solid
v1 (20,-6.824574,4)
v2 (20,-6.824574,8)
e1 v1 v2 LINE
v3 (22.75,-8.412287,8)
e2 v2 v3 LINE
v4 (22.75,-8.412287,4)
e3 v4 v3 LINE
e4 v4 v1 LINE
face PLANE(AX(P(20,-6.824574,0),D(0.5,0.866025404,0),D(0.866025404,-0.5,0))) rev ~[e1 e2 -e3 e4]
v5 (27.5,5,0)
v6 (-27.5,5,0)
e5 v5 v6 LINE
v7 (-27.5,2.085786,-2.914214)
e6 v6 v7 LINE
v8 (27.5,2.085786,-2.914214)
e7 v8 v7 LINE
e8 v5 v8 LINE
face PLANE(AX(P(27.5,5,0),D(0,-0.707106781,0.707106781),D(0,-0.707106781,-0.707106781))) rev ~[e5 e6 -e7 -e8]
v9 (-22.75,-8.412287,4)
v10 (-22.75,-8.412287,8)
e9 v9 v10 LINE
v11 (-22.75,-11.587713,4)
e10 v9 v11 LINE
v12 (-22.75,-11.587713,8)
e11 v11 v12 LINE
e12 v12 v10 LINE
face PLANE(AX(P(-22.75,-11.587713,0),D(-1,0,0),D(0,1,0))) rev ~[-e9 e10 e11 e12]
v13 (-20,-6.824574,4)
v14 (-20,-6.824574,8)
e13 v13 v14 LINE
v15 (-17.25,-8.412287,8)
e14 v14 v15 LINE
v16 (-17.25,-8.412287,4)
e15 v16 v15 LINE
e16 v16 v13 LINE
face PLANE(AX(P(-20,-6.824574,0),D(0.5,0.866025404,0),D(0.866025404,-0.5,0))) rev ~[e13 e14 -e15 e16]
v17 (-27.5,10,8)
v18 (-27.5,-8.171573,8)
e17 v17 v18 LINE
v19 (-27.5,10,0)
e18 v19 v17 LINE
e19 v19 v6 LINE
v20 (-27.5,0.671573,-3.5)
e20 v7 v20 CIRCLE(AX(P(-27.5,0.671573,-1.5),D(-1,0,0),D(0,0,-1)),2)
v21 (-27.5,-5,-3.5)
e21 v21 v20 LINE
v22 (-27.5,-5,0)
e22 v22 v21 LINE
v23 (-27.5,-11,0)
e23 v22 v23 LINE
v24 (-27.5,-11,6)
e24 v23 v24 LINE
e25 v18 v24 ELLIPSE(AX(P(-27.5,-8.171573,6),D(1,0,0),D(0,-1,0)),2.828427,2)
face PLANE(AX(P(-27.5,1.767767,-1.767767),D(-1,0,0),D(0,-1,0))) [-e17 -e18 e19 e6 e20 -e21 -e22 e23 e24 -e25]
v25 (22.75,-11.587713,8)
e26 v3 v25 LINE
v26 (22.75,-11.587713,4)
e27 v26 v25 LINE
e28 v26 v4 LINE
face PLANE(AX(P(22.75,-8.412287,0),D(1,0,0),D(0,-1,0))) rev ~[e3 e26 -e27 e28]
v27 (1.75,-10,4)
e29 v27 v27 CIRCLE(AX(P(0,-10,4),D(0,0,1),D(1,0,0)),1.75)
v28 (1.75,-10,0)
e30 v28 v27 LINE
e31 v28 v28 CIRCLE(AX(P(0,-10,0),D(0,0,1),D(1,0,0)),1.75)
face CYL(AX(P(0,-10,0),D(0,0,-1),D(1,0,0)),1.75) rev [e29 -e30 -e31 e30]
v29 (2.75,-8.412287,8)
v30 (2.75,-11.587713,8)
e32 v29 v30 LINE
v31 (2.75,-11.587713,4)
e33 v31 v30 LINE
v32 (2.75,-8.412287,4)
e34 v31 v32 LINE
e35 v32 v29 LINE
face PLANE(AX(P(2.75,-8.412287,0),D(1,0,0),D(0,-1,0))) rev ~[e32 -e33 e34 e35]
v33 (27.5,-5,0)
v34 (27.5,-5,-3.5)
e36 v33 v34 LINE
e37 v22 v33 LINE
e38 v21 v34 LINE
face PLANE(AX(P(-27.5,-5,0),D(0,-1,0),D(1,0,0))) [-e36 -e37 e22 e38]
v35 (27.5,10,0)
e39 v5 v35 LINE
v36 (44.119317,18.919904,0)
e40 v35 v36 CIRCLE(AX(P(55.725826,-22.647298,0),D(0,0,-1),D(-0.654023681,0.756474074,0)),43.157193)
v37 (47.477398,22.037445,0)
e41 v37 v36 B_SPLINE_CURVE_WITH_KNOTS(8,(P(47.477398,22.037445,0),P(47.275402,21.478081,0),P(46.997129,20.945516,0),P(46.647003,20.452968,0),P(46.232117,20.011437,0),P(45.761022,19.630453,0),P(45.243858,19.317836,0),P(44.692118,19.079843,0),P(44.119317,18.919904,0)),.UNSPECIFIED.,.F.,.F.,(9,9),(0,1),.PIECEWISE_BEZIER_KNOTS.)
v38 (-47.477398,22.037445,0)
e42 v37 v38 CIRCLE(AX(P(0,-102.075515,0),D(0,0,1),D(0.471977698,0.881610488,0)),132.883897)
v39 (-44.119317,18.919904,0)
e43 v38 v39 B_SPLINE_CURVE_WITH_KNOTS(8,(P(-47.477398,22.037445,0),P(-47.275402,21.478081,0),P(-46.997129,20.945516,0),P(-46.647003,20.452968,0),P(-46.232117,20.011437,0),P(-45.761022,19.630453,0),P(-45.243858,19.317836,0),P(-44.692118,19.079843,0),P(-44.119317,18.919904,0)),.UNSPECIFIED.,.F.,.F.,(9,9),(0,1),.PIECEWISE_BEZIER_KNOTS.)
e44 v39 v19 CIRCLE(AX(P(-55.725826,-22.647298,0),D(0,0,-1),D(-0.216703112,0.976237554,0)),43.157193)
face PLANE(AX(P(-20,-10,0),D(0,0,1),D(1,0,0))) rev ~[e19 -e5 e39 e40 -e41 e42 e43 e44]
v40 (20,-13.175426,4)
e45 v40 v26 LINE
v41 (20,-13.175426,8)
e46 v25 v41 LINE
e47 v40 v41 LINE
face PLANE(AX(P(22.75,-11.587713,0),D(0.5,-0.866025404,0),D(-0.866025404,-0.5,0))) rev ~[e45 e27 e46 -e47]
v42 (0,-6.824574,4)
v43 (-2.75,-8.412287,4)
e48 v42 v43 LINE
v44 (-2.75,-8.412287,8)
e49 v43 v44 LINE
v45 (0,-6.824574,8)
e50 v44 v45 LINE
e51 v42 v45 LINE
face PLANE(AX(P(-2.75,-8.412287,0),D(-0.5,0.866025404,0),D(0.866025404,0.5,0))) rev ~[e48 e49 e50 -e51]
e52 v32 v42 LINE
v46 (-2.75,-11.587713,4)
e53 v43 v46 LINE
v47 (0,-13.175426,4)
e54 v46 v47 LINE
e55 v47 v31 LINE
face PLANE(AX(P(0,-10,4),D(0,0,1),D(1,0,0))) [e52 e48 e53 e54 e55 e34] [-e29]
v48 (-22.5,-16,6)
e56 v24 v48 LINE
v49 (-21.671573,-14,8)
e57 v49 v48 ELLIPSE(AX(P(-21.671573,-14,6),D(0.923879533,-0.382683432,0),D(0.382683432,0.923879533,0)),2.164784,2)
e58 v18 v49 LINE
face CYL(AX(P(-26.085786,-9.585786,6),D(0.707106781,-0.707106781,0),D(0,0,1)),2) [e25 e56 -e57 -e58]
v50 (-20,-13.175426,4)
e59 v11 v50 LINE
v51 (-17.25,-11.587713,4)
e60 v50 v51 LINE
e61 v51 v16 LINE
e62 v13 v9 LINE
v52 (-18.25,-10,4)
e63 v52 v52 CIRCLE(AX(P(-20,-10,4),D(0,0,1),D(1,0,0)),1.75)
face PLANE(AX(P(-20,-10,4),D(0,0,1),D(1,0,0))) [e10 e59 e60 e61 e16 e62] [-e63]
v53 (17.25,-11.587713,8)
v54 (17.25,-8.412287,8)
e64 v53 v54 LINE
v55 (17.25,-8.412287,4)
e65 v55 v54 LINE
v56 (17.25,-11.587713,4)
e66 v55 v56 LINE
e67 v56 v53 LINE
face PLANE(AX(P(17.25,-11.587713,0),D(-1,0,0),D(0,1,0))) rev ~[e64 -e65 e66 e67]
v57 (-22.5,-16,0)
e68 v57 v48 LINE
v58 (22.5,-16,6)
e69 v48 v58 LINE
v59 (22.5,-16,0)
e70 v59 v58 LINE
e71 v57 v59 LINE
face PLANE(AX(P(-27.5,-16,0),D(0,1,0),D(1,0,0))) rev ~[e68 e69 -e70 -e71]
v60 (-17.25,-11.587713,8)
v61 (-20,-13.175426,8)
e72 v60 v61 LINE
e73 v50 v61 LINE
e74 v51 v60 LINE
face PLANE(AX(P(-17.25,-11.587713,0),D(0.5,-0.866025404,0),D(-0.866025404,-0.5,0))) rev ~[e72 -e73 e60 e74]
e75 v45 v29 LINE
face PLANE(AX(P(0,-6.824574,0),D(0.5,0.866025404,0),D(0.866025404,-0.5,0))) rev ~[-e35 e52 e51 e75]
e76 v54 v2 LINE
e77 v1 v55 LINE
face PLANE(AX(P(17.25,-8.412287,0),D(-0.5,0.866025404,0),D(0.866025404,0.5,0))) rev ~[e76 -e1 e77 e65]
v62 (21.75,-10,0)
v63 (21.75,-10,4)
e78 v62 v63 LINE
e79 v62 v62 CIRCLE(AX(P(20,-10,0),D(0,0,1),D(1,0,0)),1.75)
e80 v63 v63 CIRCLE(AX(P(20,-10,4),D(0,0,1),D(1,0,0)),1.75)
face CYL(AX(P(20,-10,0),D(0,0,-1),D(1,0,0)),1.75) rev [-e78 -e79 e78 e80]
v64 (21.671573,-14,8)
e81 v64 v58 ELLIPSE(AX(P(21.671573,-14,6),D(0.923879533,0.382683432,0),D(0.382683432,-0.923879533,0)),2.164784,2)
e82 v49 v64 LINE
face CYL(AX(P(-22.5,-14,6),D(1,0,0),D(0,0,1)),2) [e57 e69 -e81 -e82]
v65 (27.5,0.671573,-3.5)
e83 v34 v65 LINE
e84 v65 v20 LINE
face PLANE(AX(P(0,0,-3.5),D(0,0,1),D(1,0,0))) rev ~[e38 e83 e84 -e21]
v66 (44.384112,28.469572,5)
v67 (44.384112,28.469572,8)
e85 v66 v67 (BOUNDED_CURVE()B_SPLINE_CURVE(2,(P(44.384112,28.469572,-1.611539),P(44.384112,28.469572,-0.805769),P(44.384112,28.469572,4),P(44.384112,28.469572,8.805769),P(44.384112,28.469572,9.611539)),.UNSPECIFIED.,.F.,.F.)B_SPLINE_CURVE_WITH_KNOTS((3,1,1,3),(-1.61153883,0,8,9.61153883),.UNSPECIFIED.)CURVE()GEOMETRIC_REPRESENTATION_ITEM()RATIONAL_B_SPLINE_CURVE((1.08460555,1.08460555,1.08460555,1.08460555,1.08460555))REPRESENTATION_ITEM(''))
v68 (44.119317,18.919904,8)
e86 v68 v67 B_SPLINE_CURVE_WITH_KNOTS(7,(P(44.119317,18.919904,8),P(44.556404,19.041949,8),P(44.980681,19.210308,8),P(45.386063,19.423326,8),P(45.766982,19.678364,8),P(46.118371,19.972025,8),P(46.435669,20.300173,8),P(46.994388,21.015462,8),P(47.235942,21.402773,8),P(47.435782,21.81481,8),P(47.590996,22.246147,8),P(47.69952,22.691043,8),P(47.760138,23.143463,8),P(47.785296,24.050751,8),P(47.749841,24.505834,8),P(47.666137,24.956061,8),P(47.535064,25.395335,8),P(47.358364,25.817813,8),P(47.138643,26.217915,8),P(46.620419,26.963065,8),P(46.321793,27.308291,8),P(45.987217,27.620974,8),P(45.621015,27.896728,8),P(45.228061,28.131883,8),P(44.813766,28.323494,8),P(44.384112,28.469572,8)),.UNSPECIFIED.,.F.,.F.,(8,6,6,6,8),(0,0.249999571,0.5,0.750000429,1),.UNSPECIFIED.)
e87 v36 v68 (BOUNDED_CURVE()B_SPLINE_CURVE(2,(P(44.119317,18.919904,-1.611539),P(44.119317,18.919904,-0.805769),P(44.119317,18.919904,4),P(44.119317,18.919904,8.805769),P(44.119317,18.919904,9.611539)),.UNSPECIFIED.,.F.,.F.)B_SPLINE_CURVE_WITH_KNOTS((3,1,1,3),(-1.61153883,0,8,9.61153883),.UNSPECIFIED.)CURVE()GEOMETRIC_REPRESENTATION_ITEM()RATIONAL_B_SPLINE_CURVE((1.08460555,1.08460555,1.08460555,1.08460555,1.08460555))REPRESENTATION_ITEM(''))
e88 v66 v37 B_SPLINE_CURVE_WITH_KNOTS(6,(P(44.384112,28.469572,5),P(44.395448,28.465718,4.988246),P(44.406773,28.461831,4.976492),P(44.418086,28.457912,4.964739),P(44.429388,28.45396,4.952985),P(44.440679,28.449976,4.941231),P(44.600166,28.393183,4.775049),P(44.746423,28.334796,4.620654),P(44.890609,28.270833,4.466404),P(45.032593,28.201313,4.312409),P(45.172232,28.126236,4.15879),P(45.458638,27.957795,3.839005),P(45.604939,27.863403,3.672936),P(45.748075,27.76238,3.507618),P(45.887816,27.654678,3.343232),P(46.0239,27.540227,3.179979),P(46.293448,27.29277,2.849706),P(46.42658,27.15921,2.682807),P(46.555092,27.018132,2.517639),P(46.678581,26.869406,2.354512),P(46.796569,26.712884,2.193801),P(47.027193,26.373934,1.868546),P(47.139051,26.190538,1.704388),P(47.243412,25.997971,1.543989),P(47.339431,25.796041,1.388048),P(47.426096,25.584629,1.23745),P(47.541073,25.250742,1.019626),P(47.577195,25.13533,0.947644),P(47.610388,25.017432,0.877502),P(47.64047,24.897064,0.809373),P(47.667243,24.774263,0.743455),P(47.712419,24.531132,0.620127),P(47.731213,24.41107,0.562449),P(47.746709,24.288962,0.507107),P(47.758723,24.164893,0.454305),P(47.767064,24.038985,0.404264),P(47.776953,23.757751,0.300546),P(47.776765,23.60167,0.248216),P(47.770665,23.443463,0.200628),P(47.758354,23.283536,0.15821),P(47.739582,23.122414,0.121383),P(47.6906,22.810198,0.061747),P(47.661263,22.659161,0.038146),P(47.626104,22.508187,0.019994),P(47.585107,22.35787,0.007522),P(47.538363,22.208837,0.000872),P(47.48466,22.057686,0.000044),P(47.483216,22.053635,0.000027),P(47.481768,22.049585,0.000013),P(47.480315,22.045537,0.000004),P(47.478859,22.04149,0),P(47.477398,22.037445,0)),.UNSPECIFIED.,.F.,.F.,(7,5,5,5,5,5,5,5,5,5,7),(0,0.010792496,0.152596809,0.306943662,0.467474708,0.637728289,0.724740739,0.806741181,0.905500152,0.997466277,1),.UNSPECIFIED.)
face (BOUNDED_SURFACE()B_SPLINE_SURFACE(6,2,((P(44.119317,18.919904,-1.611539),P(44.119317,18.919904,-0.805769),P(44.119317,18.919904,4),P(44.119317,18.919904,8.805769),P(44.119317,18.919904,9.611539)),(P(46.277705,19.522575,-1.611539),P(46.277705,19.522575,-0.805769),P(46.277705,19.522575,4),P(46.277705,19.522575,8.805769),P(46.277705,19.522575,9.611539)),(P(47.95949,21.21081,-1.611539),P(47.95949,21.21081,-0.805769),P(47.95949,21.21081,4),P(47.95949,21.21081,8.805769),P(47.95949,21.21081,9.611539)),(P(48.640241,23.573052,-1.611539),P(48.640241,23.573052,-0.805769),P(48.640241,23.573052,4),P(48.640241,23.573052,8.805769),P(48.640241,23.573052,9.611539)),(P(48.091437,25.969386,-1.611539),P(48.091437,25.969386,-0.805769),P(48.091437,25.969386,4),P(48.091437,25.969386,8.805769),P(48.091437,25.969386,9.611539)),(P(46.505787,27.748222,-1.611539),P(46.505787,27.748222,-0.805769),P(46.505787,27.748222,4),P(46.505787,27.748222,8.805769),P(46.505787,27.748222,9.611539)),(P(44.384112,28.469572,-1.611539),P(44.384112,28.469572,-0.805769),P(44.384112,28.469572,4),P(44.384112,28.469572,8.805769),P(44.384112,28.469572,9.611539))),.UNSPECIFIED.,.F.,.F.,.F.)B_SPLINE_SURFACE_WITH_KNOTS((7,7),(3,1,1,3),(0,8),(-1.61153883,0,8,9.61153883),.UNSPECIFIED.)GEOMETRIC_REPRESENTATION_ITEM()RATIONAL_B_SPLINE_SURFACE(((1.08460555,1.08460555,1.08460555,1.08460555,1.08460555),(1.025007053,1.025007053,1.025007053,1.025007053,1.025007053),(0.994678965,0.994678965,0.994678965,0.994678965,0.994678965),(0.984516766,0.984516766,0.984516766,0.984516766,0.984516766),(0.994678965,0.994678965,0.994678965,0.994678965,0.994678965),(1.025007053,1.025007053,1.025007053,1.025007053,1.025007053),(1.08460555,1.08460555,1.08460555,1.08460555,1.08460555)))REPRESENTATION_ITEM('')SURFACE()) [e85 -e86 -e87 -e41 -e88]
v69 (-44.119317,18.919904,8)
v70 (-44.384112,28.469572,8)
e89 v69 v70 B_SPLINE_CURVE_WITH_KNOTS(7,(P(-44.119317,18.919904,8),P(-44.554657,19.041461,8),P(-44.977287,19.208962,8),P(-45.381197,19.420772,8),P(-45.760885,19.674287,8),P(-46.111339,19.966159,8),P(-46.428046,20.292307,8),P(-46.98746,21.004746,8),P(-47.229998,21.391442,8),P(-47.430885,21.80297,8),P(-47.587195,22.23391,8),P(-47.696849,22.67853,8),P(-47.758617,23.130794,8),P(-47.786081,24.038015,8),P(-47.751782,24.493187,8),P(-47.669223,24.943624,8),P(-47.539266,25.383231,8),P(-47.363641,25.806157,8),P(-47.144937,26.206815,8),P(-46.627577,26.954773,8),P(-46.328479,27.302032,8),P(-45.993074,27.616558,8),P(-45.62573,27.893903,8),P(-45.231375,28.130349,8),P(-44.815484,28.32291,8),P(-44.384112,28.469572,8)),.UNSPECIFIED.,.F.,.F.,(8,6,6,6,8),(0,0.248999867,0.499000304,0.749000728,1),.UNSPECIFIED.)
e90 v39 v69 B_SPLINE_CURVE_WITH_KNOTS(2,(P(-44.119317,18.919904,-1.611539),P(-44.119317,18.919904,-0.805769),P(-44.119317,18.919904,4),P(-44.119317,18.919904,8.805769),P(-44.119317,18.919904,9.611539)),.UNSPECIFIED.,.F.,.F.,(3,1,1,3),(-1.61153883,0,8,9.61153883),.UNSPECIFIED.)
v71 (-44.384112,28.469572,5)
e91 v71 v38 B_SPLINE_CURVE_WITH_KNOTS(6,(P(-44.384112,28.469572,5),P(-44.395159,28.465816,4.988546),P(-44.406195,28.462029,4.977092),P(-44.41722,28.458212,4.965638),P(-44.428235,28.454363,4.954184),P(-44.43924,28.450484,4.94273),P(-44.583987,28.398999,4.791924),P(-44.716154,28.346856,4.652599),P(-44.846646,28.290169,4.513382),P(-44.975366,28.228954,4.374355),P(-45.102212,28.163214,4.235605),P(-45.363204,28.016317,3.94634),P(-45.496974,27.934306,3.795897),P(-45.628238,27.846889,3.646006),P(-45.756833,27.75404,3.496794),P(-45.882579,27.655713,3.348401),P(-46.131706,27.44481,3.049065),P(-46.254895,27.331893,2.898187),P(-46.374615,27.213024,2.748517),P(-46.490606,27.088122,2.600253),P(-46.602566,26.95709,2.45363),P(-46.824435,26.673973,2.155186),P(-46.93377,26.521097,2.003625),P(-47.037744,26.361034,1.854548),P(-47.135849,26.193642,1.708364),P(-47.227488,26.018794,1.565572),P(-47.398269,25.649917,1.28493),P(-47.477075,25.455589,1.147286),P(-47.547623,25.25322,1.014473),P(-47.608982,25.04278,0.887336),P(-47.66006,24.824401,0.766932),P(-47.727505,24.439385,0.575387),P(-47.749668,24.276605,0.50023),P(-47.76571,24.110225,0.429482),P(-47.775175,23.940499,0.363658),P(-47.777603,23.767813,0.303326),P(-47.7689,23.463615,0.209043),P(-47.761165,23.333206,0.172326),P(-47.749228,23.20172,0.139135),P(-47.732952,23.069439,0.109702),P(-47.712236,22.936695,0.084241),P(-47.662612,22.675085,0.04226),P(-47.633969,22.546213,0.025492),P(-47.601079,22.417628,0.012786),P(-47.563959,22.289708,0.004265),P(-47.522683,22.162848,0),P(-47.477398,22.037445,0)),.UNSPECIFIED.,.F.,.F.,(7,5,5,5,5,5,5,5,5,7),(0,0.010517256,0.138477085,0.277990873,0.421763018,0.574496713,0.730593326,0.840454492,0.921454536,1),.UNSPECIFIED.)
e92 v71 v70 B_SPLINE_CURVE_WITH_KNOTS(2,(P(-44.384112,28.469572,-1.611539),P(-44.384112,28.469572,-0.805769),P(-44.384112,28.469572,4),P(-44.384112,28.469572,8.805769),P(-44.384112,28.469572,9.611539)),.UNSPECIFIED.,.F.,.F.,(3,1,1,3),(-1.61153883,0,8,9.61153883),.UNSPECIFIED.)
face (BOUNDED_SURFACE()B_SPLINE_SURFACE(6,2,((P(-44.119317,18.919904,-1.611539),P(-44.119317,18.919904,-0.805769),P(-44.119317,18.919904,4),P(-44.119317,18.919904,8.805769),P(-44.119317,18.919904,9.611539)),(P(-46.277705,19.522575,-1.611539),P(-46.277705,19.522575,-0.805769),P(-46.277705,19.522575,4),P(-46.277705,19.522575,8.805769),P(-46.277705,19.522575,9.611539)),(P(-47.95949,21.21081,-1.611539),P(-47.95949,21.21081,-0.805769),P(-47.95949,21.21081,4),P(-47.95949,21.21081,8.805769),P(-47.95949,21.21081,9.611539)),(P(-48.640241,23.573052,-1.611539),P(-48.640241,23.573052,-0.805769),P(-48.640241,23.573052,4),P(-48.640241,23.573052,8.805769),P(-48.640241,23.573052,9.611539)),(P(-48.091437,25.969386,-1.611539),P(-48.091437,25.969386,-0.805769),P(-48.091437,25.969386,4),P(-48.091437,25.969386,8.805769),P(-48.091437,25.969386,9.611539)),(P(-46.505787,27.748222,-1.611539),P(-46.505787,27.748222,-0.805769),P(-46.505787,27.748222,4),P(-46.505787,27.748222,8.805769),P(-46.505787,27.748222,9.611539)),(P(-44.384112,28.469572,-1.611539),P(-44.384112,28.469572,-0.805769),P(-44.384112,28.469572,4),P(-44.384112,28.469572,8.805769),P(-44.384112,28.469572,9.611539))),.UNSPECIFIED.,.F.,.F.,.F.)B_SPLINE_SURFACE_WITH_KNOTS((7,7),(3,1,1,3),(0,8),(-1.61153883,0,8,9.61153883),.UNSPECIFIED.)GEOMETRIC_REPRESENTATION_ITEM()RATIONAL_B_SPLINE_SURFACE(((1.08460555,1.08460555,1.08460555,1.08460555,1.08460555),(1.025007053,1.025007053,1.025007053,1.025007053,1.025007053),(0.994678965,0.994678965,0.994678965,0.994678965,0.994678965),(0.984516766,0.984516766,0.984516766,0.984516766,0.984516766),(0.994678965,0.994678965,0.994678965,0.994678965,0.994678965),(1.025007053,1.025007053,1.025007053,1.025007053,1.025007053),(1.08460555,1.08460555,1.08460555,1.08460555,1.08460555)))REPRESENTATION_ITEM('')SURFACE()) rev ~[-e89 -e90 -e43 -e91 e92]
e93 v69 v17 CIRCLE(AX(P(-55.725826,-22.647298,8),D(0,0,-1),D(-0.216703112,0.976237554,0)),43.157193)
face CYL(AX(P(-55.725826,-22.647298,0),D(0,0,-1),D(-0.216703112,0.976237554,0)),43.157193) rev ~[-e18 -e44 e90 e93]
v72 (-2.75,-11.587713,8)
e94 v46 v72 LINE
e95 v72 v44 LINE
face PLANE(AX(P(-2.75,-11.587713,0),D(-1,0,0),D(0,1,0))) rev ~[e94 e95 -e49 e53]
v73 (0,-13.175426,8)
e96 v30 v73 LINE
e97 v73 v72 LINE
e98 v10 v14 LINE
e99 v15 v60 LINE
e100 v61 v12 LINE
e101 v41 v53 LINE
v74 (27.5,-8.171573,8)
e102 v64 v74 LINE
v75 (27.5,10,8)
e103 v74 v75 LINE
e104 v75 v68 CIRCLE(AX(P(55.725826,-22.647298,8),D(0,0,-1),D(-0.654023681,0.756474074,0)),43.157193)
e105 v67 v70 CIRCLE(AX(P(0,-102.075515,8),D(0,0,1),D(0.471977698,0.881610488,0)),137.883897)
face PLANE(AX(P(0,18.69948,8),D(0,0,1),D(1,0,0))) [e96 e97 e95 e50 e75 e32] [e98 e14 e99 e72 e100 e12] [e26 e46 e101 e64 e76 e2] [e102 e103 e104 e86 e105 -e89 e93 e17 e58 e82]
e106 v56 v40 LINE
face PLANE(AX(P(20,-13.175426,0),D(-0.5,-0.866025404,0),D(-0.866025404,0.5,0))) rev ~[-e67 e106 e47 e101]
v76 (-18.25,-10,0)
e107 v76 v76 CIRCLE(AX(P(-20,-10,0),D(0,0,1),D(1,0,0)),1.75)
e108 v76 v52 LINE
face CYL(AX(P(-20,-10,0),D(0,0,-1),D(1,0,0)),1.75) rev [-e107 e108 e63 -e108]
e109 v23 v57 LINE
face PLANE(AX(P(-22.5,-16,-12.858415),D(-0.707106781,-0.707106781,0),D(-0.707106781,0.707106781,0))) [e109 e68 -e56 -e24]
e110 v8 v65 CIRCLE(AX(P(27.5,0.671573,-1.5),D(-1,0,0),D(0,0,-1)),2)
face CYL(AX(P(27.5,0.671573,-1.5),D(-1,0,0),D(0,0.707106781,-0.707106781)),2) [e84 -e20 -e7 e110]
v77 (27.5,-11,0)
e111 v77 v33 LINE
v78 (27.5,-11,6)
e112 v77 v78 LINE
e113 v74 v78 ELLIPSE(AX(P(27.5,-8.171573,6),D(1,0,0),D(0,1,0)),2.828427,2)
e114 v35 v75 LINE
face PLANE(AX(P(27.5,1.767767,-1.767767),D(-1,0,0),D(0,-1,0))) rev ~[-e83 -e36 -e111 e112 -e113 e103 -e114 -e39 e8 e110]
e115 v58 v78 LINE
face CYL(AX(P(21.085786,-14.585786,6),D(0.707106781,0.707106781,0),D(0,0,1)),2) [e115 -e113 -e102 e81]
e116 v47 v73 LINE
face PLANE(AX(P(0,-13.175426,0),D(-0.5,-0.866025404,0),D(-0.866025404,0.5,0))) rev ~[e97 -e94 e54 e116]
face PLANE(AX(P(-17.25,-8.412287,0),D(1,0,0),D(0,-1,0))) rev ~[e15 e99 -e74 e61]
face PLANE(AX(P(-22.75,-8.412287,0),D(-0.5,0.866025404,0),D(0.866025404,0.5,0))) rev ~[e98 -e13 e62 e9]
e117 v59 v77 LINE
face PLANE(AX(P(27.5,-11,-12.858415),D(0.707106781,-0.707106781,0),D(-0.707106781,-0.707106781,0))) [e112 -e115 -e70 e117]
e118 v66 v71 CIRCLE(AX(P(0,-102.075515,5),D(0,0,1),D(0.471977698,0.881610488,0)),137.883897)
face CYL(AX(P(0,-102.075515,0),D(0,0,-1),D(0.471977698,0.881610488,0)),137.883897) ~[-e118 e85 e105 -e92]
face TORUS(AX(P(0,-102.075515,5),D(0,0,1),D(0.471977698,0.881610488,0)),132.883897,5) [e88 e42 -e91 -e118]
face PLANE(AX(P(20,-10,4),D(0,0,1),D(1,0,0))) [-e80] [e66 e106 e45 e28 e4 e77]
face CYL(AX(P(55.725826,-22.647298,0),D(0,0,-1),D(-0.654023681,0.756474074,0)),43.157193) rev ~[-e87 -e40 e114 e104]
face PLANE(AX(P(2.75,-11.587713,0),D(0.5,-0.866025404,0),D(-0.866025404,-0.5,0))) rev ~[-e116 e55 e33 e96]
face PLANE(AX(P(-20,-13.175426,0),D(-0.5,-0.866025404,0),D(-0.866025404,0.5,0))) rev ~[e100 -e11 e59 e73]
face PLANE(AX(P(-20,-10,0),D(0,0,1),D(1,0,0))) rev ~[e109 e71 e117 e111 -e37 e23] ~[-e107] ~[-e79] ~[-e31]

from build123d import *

# Parameters (mm, degrees)
F1_W        = 55
F1_H        = 5
F1_H_2      = 11
F2_DEPTH    = 8
F1_R        = 1.75
F3_DEPTH    = 4
F4_DEPTH    = 3.5
F5_T4_DEPTH = 55
F5_T6_DEPTH = 33.7168298797
F6_R        = 5
F7_R        = 2


# Not quite as in the source:
# - a fillet or chamfer that OpenCascade refuses, or shapes differently, is made with other operations: its cross-section is extruded or revolved along the edge and cut away or added
# - a feature names something its author has since deleted; it is built from what else it names


with BuildPart() as f2:
    # F1 (on Top) → F2 (new body)
    with BuildSketch(Plane.XY):
        with BuildLine():
            Line((-27.5, 10), (-27.5, 0))
            Line((-27.5, 0), (27.5, 0))
            Line((27.5, 0), (27.5, 10))
            ThreePointArc((27.5, 10), (45.1645357284, 19.1976835871), (65.078124404, 19.4843749404))
            ThreePointArc((65.078124404, 19.4843749404), (0, 35.8083822448), (-65.078124404, 19.4843749404))
            ThreePointArc((-65.078124404, 19.4843749404), (-45.1645357284, 19.1976835871), (-27.5, 10))
        make_face()
        with Locations((0, -2.5)):
            Rectangle(F1_W, F1_H)
        with Locations((0, -10.5)):
            Rectangle(F1_W, F1_H_2)
        Polygon((-20, -13.1754264805), (-22.75, -11.5877132403), (-22.75, -8.4122867597), (-20, -6.8245735195), (-17.25, -8.4122867597), (-17.25, -11.5877132403), align=None, mode=Mode.SUBTRACT)
        Polygon((0, -13.1754264805), (-2.75, -11.5877132403), (-2.75, -8.4122867597), (0, -6.8245735195), (2.75, -8.4122867597), (2.75, -11.5877132403), align=None, mode=Mode.SUBTRACT)
        Polygon((20, -13.1754264805), (17.25, -11.5877132403), (17.25, -8.4122867597), (20, -6.8245735195), (22.75, -8.4122867597), (22.75, -11.5877132403), align=None, mode=Mode.SUBTRACT)
    extrude(amount=F2_DEPTH)

    # F1 (on Top) → F3 (join)
    with BuildSketch(Plane.XY):
        Polygon((-22.75, -8.4122867597), (-22.75, -11.5877132403), (-20, -13.1754264805), (-17.25, -11.5877132403), (-17.25, -8.4122867597), (-20, -6.8245735195), align=None)
        with Locations((-20, -10)):
            Circle(F1_R, mode=Mode.SUBTRACT)
        Polygon((-2.75, -8.4122867597), (-2.75, -11.5877132403), (0, -13.1754264805), (2.75, -11.5877132403), (2.75, -8.4122867597), (0, -6.8245735195), align=None)
        with Locations((0, -10)):
            Circle(F1_R, mode=Mode.SUBTRACT)
        Polygon((17.25, -8.4122867597), (17.25, -11.5877132403), (20, -13.1754264805), (22.75, -11.5877132403), (22.75, -8.4122867597), (20, -6.8245735195), align=None)
        with Locations((20, -10)):
            Circle(F1_R, mode=Mode.SUBTRACT)
    extrude(amount=F3_DEPTH)

    # F1 (on Top) → F4 (join)
    with BuildSketch(Plane.XY):
        with Locations((0, -2.5)):
            Rectangle(F1_W, F1_H)
    extrude(amount=-F4_DEPTH)

    # F5: chamfer of 5 on 3 edges, made by hand


with BuildPart() as f5_tool2:
    # F5_s3 → F5_t4 (new body)
    with BuildSketch(Plane.YZ.offset(27.5)):
        Polygon((5, 0), (0, -5), (0, 0), align=None)
    extrude(amount=-F5_T4_DEPTH)

    split(bisect_by=Plane.XY.offset(-3.5), keep=Keep.TOP)


with BuildPart() as f2_1:
    add(f2.part)

    # F5_t1: union F5_tool2
    add(f5_tool2.part)

    # F5_s7 → F5_t6 (cut)
    with BuildSketch(Plane.XY.offset(-12.8584149398)):
        Polygon((-22.5, -16), (-27.5, -11), (-27.5, -16), align=None)
        Polygon((27.5, -11), (22.5, -16), (27.5, -16), align=None)
    extrude(amount=F5_T6_DEPTH, mode=Mode.SUBTRACT)

    # F6
    f6_edges = [f2_1.edges().sort_by_distance(p)[0] for p in [
        (0, 35.808382, 0),
        (-65.078124, 19.484375, 4),
        (65.078124, 19.484375, 4),
    ]]
    fillet(f6_edges, radius=F6_R)

    # F7
    f7_edges = [f2_1.edges().sort_by_distance(p)[0] for p in [
        (0, -16, 8),
        (-25, -13.5, 8),
        (25, -13.5, 8),
        (0, 1.5, -3.5),
    ]]
    fillet(f7_edges, radius=F7_R)


solid = f2_1.part
